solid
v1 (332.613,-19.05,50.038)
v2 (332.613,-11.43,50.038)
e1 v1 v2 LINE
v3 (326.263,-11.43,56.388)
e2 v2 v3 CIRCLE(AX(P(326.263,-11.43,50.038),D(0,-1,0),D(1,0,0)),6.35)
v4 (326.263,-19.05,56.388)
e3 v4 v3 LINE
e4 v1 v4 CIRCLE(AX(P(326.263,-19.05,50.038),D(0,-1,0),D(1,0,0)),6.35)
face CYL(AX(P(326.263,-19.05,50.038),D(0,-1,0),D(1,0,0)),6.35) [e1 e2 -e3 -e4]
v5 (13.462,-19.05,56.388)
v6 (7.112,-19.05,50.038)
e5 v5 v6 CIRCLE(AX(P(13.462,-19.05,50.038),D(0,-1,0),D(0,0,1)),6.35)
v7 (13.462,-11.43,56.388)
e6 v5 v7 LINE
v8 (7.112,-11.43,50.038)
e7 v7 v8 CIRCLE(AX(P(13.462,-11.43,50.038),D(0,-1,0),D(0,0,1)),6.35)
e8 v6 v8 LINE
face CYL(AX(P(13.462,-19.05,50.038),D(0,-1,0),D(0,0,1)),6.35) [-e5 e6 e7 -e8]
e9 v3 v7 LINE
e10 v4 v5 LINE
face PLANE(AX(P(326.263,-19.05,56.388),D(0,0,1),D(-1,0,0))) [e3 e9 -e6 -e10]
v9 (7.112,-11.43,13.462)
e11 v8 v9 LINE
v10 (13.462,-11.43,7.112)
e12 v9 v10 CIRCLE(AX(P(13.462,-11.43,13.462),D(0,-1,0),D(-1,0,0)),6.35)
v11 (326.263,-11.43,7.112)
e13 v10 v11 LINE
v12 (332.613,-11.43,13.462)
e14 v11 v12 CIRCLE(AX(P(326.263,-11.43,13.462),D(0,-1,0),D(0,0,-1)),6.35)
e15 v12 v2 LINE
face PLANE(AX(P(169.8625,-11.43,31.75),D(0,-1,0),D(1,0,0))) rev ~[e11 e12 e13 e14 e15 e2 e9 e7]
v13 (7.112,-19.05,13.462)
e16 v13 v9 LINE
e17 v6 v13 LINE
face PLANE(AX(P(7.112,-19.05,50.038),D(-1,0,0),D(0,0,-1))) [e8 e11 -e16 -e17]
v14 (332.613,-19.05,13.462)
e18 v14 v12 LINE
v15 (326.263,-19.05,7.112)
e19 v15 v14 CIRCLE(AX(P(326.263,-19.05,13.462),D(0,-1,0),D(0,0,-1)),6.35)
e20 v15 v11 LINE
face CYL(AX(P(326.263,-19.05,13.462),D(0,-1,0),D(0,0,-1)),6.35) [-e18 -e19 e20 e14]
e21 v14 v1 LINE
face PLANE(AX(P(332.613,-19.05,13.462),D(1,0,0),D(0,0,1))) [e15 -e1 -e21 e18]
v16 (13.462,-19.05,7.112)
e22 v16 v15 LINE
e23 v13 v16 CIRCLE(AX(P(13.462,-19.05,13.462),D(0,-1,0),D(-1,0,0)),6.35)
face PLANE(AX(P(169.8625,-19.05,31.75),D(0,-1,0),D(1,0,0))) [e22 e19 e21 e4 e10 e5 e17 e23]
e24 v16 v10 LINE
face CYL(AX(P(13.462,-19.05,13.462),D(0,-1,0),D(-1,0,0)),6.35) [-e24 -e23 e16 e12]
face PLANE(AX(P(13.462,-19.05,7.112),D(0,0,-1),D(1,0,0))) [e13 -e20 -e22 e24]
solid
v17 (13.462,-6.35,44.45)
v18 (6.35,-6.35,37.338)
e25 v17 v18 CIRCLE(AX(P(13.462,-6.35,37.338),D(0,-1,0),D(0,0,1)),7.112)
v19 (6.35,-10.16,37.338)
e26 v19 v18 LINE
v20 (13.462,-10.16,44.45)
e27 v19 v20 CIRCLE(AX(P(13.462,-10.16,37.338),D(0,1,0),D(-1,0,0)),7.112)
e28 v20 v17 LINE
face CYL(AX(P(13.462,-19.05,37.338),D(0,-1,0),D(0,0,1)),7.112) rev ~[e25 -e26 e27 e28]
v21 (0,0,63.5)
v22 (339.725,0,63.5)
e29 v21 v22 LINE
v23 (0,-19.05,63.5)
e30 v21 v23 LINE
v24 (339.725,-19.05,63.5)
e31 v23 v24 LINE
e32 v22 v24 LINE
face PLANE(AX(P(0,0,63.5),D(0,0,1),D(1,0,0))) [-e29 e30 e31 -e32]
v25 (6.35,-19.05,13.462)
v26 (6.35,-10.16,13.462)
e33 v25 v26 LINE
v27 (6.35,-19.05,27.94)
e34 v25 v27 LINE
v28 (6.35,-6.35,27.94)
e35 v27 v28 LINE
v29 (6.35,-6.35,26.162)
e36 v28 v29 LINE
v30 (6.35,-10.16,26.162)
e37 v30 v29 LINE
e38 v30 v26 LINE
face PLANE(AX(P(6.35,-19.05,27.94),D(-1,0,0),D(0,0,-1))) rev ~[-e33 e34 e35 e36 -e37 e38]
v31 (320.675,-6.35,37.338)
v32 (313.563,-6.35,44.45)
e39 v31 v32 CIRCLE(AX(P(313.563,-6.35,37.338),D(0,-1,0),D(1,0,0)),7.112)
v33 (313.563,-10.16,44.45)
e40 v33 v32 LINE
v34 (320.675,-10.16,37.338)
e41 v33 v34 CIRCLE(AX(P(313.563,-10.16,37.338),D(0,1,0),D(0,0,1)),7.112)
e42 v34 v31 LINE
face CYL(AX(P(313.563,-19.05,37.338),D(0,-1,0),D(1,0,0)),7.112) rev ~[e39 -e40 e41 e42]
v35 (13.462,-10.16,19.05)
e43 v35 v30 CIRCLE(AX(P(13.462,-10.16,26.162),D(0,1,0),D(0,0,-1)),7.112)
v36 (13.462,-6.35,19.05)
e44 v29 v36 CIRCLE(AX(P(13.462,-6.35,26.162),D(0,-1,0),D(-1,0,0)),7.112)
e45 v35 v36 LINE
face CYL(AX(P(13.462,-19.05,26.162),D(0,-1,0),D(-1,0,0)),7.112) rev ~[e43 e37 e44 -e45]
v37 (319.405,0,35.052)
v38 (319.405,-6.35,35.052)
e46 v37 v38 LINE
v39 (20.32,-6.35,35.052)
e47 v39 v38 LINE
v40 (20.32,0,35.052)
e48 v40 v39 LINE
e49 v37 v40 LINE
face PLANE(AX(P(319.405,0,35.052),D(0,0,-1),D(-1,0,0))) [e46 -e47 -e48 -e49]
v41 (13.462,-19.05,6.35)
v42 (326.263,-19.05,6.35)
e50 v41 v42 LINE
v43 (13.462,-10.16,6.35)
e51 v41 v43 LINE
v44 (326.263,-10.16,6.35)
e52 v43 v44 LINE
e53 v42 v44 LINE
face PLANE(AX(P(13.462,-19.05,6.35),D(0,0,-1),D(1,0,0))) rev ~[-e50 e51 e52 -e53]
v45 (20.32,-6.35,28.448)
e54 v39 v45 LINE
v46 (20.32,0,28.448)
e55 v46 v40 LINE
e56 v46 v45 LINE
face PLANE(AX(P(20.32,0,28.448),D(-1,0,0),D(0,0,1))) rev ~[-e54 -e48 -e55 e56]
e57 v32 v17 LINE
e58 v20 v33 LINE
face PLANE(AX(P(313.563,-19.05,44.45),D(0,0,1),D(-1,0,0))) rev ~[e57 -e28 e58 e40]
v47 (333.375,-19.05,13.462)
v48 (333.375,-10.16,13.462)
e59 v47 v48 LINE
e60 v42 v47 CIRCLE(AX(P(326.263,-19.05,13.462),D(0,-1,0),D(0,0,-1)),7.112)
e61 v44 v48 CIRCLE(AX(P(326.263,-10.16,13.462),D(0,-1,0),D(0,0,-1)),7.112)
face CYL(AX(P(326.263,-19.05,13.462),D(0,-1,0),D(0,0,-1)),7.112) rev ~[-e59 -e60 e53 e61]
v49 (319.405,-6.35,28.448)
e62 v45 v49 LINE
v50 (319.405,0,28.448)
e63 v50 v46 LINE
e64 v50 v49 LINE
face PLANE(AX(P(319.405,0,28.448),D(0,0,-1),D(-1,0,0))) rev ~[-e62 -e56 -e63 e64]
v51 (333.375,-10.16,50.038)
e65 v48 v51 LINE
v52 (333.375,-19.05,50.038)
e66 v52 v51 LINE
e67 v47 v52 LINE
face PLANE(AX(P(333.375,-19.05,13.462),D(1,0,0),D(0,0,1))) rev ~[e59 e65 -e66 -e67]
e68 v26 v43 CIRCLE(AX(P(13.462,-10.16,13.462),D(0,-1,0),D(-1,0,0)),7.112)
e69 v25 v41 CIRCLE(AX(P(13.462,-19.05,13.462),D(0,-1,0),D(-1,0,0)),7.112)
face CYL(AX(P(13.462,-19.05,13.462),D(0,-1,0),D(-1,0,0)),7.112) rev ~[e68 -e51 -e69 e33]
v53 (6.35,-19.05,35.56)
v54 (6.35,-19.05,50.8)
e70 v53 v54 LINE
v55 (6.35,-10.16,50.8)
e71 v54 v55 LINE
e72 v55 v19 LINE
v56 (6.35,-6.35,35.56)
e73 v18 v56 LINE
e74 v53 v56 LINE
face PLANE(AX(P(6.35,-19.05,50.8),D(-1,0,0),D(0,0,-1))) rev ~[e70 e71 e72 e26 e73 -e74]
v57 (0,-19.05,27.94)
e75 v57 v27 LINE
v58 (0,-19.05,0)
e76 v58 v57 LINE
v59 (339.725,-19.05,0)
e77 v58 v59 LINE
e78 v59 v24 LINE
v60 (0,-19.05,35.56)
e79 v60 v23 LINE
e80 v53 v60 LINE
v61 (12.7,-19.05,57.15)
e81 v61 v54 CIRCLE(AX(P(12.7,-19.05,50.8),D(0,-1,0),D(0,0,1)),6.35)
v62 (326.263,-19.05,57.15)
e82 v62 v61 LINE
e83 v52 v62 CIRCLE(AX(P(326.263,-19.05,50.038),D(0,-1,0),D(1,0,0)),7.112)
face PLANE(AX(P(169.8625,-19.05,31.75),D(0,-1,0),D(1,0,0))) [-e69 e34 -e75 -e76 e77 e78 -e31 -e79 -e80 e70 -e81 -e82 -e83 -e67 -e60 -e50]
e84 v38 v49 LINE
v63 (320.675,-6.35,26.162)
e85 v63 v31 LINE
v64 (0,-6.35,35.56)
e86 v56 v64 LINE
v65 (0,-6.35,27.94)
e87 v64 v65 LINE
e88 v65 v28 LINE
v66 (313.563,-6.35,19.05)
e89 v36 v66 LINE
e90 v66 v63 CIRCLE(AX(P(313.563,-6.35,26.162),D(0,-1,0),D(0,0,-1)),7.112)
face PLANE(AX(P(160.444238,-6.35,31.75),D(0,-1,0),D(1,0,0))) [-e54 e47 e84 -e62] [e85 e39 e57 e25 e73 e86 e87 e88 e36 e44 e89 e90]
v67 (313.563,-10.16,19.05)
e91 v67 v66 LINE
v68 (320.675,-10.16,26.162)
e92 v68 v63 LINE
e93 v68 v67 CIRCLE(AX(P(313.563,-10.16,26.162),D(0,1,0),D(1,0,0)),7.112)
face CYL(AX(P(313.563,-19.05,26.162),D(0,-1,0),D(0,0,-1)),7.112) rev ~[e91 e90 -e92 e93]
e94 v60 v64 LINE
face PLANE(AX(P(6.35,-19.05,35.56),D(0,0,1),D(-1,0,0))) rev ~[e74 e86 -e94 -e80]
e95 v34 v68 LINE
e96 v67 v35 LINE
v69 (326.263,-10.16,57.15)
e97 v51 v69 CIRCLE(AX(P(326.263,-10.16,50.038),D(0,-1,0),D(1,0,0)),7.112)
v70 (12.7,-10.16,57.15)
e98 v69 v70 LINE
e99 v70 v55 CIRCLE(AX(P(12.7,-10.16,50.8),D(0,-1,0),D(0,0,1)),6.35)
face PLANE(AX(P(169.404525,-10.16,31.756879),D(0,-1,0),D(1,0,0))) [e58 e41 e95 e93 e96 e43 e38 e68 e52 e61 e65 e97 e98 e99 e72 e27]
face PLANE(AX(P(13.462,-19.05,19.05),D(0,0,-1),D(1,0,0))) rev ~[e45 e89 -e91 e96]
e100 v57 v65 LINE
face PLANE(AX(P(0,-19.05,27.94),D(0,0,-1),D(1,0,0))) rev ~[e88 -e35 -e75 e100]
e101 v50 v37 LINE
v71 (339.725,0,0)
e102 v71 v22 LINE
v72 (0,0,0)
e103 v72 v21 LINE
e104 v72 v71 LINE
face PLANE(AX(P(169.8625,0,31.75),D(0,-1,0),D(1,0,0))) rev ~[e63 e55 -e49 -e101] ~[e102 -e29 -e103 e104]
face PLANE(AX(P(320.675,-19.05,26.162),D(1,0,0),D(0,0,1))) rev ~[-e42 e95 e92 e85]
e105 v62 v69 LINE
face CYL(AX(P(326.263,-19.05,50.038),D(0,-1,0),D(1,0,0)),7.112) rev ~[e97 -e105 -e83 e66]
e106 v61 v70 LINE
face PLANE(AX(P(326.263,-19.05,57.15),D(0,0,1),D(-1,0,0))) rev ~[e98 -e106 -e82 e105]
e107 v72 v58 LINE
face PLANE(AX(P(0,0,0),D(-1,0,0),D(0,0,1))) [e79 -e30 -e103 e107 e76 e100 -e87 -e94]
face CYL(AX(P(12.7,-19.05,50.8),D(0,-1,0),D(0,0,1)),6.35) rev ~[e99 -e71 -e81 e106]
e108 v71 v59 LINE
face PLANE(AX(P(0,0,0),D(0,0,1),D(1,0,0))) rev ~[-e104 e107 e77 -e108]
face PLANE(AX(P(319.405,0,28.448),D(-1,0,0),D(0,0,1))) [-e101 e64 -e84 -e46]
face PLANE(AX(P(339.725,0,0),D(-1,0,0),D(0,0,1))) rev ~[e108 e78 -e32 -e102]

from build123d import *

# Parameters (mm, degrees)
F0_W     = 339.725
F0_H     = 63.5
F1_DEPTH = 19.05
F3_DEPTH = 12.7
F5_DEPTH = 8.89
F7_DEPTH = 7.62
F8_W     = 299.085
F8_H     = 6.604
F9_DEPTH = 25.4


with BuildPart() as f1:
    # F0 (on Front) → F1 (new body)
    with BuildSketch(Plane.XZ):
        with Locations((169.8625, 31.75)):
            Rectangle(F0_W, F0_H)
    extrude(amount=F1_DEPTH)

    # F2 (on face) → F3 (cut)
    with BuildSketch(Plane.XZ.offset(19.05)):
        with BuildLine():
            Line((313.563, 44.45), (13.462, 44.45))
            ThreePointArc((13.462, 44.45), (8.4330565722, 42.3669434278), (6.35, 37.338))
            Line((6.35, 37.338), (6.35, 35.56))
            Line((6.35, 35.56), (0, 35.56))
            Line((0, 35.56), (0, 27.94))
            Line((0, 27.94), (6.35, 27.94))
            Line((6.35, 27.94), (6.35, 26.162))
            ThreePointArc((6.35, 26.162), (8.4330565722, 21.1330565722), (13.462, 19.05))
            Line((13.462, 19.05), (313.563, 19.05))
            ThreePointArc((313.563, 19.05), (318.5919434278, 21.1330565722), (320.675, 26.162))
            Line((320.675, 26.162), (320.675, 37.338))
            ThreePointArc((320.675, 37.338), (318.5919434278, 42.3669434278), (313.563, 44.45))
        make_face()
    extrude(amount=-F3_DEPTH, mode=Mode.SUBTRACT)

    # F4 (on face) → F5 (cut)
    with BuildSketch(Plane.XZ.offset(19.05)):
        with BuildLine():
            Line((326.263, 57.15), (12.7, 57.15))
            ThreePointArc((12.7, 57.15), (8.2098719395, 55.2901280605), (6.35, 50.8))
            Line((6.35, 50.8), (6.35, 37.338))
            ThreePointArc((6.35, 37.338), (8.4330565722, 42.3669434278), (13.462, 44.45))
            Line((13.462, 44.45), (313.563, 44.45))
            ThreePointArc((313.563, 44.45), (318.5919434278, 42.3669434278), (320.675, 37.338))
            Line((320.675, 37.338), (320.675, 26.162))
            ThreePointArc((320.675, 26.162), (318.5919434278, 21.1330565722), (313.563, 19.05))
            Line((313.563, 19.05), (13.462, 19.05))
            ThreePointArc((13.462, 19.05), (8.4330565722, 21.1330565722), (6.35, 26.162))
            Line((6.35, 26.162), (6.35, 13.462))
            ThreePointArc((6.35, 13.462), (8.4330565722, 8.4330565722), (13.462, 6.35))
            Line((13.462, 6.35), (326.263, 6.35))
            ThreePointArc((326.263, 6.35), (331.2919434278, 8.4330565722), (333.375, 13.462))
            Line((333.375, 13.462), (333.375, 50.038))
            ThreePointArc((333.375, 50.038), (331.2919434278, 55.0669434278), (326.263, 57.15))
        make_face()
    extrude(amount=-F5_DEPTH, mode=Mode.SUBTRACT)

    # F8 (on face) → F9 (cut)
    with BuildSketch(Plane(origin=(0, 0, 0), x_dir=(-1, 0, 0), z_dir=(0, 1, 0))):
        with Locations((-169.8625, 31.75)):
            Rectangle(F8_W, F8_H)
    extrude(amount=-F9_DEPTH, mode=Mode.SUBTRACT)


with BuildPart() as f7:
    # F6 (on face) → F7 (new body)
    with BuildSketch(Plane.XZ.offset(19.05)):
        with BuildLine():
            Line((326.263, 56.388), (13.462, 56.388))
            ThreePointArc((13.462, 56.388), (8.9718719395, 54.5281280605), (7.112, 50.038))
            Line((7.112, 50.038), (7.112, 13.462))
            ThreePointArc((7.112, 13.462), (8.9718719395, 8.9718719395), (13.462, 7.112))
            Line((13.462, 7.112), (326.263, 7.112))
            ThreePointArc((326.263, 7.112), (330.7531280605, 8.9718719395), (332.613, 13.462))
            Line((332.613, 13.462), (332.613, 50.038))
            ThreePointArc((332.613, 50.038), (330.7531280605, 54.5281280605), (326.263, 56.388))
        make_face()
    extrude(amount=-F7_DEPTH)


solid = Compound([f1.part, f7.part])
